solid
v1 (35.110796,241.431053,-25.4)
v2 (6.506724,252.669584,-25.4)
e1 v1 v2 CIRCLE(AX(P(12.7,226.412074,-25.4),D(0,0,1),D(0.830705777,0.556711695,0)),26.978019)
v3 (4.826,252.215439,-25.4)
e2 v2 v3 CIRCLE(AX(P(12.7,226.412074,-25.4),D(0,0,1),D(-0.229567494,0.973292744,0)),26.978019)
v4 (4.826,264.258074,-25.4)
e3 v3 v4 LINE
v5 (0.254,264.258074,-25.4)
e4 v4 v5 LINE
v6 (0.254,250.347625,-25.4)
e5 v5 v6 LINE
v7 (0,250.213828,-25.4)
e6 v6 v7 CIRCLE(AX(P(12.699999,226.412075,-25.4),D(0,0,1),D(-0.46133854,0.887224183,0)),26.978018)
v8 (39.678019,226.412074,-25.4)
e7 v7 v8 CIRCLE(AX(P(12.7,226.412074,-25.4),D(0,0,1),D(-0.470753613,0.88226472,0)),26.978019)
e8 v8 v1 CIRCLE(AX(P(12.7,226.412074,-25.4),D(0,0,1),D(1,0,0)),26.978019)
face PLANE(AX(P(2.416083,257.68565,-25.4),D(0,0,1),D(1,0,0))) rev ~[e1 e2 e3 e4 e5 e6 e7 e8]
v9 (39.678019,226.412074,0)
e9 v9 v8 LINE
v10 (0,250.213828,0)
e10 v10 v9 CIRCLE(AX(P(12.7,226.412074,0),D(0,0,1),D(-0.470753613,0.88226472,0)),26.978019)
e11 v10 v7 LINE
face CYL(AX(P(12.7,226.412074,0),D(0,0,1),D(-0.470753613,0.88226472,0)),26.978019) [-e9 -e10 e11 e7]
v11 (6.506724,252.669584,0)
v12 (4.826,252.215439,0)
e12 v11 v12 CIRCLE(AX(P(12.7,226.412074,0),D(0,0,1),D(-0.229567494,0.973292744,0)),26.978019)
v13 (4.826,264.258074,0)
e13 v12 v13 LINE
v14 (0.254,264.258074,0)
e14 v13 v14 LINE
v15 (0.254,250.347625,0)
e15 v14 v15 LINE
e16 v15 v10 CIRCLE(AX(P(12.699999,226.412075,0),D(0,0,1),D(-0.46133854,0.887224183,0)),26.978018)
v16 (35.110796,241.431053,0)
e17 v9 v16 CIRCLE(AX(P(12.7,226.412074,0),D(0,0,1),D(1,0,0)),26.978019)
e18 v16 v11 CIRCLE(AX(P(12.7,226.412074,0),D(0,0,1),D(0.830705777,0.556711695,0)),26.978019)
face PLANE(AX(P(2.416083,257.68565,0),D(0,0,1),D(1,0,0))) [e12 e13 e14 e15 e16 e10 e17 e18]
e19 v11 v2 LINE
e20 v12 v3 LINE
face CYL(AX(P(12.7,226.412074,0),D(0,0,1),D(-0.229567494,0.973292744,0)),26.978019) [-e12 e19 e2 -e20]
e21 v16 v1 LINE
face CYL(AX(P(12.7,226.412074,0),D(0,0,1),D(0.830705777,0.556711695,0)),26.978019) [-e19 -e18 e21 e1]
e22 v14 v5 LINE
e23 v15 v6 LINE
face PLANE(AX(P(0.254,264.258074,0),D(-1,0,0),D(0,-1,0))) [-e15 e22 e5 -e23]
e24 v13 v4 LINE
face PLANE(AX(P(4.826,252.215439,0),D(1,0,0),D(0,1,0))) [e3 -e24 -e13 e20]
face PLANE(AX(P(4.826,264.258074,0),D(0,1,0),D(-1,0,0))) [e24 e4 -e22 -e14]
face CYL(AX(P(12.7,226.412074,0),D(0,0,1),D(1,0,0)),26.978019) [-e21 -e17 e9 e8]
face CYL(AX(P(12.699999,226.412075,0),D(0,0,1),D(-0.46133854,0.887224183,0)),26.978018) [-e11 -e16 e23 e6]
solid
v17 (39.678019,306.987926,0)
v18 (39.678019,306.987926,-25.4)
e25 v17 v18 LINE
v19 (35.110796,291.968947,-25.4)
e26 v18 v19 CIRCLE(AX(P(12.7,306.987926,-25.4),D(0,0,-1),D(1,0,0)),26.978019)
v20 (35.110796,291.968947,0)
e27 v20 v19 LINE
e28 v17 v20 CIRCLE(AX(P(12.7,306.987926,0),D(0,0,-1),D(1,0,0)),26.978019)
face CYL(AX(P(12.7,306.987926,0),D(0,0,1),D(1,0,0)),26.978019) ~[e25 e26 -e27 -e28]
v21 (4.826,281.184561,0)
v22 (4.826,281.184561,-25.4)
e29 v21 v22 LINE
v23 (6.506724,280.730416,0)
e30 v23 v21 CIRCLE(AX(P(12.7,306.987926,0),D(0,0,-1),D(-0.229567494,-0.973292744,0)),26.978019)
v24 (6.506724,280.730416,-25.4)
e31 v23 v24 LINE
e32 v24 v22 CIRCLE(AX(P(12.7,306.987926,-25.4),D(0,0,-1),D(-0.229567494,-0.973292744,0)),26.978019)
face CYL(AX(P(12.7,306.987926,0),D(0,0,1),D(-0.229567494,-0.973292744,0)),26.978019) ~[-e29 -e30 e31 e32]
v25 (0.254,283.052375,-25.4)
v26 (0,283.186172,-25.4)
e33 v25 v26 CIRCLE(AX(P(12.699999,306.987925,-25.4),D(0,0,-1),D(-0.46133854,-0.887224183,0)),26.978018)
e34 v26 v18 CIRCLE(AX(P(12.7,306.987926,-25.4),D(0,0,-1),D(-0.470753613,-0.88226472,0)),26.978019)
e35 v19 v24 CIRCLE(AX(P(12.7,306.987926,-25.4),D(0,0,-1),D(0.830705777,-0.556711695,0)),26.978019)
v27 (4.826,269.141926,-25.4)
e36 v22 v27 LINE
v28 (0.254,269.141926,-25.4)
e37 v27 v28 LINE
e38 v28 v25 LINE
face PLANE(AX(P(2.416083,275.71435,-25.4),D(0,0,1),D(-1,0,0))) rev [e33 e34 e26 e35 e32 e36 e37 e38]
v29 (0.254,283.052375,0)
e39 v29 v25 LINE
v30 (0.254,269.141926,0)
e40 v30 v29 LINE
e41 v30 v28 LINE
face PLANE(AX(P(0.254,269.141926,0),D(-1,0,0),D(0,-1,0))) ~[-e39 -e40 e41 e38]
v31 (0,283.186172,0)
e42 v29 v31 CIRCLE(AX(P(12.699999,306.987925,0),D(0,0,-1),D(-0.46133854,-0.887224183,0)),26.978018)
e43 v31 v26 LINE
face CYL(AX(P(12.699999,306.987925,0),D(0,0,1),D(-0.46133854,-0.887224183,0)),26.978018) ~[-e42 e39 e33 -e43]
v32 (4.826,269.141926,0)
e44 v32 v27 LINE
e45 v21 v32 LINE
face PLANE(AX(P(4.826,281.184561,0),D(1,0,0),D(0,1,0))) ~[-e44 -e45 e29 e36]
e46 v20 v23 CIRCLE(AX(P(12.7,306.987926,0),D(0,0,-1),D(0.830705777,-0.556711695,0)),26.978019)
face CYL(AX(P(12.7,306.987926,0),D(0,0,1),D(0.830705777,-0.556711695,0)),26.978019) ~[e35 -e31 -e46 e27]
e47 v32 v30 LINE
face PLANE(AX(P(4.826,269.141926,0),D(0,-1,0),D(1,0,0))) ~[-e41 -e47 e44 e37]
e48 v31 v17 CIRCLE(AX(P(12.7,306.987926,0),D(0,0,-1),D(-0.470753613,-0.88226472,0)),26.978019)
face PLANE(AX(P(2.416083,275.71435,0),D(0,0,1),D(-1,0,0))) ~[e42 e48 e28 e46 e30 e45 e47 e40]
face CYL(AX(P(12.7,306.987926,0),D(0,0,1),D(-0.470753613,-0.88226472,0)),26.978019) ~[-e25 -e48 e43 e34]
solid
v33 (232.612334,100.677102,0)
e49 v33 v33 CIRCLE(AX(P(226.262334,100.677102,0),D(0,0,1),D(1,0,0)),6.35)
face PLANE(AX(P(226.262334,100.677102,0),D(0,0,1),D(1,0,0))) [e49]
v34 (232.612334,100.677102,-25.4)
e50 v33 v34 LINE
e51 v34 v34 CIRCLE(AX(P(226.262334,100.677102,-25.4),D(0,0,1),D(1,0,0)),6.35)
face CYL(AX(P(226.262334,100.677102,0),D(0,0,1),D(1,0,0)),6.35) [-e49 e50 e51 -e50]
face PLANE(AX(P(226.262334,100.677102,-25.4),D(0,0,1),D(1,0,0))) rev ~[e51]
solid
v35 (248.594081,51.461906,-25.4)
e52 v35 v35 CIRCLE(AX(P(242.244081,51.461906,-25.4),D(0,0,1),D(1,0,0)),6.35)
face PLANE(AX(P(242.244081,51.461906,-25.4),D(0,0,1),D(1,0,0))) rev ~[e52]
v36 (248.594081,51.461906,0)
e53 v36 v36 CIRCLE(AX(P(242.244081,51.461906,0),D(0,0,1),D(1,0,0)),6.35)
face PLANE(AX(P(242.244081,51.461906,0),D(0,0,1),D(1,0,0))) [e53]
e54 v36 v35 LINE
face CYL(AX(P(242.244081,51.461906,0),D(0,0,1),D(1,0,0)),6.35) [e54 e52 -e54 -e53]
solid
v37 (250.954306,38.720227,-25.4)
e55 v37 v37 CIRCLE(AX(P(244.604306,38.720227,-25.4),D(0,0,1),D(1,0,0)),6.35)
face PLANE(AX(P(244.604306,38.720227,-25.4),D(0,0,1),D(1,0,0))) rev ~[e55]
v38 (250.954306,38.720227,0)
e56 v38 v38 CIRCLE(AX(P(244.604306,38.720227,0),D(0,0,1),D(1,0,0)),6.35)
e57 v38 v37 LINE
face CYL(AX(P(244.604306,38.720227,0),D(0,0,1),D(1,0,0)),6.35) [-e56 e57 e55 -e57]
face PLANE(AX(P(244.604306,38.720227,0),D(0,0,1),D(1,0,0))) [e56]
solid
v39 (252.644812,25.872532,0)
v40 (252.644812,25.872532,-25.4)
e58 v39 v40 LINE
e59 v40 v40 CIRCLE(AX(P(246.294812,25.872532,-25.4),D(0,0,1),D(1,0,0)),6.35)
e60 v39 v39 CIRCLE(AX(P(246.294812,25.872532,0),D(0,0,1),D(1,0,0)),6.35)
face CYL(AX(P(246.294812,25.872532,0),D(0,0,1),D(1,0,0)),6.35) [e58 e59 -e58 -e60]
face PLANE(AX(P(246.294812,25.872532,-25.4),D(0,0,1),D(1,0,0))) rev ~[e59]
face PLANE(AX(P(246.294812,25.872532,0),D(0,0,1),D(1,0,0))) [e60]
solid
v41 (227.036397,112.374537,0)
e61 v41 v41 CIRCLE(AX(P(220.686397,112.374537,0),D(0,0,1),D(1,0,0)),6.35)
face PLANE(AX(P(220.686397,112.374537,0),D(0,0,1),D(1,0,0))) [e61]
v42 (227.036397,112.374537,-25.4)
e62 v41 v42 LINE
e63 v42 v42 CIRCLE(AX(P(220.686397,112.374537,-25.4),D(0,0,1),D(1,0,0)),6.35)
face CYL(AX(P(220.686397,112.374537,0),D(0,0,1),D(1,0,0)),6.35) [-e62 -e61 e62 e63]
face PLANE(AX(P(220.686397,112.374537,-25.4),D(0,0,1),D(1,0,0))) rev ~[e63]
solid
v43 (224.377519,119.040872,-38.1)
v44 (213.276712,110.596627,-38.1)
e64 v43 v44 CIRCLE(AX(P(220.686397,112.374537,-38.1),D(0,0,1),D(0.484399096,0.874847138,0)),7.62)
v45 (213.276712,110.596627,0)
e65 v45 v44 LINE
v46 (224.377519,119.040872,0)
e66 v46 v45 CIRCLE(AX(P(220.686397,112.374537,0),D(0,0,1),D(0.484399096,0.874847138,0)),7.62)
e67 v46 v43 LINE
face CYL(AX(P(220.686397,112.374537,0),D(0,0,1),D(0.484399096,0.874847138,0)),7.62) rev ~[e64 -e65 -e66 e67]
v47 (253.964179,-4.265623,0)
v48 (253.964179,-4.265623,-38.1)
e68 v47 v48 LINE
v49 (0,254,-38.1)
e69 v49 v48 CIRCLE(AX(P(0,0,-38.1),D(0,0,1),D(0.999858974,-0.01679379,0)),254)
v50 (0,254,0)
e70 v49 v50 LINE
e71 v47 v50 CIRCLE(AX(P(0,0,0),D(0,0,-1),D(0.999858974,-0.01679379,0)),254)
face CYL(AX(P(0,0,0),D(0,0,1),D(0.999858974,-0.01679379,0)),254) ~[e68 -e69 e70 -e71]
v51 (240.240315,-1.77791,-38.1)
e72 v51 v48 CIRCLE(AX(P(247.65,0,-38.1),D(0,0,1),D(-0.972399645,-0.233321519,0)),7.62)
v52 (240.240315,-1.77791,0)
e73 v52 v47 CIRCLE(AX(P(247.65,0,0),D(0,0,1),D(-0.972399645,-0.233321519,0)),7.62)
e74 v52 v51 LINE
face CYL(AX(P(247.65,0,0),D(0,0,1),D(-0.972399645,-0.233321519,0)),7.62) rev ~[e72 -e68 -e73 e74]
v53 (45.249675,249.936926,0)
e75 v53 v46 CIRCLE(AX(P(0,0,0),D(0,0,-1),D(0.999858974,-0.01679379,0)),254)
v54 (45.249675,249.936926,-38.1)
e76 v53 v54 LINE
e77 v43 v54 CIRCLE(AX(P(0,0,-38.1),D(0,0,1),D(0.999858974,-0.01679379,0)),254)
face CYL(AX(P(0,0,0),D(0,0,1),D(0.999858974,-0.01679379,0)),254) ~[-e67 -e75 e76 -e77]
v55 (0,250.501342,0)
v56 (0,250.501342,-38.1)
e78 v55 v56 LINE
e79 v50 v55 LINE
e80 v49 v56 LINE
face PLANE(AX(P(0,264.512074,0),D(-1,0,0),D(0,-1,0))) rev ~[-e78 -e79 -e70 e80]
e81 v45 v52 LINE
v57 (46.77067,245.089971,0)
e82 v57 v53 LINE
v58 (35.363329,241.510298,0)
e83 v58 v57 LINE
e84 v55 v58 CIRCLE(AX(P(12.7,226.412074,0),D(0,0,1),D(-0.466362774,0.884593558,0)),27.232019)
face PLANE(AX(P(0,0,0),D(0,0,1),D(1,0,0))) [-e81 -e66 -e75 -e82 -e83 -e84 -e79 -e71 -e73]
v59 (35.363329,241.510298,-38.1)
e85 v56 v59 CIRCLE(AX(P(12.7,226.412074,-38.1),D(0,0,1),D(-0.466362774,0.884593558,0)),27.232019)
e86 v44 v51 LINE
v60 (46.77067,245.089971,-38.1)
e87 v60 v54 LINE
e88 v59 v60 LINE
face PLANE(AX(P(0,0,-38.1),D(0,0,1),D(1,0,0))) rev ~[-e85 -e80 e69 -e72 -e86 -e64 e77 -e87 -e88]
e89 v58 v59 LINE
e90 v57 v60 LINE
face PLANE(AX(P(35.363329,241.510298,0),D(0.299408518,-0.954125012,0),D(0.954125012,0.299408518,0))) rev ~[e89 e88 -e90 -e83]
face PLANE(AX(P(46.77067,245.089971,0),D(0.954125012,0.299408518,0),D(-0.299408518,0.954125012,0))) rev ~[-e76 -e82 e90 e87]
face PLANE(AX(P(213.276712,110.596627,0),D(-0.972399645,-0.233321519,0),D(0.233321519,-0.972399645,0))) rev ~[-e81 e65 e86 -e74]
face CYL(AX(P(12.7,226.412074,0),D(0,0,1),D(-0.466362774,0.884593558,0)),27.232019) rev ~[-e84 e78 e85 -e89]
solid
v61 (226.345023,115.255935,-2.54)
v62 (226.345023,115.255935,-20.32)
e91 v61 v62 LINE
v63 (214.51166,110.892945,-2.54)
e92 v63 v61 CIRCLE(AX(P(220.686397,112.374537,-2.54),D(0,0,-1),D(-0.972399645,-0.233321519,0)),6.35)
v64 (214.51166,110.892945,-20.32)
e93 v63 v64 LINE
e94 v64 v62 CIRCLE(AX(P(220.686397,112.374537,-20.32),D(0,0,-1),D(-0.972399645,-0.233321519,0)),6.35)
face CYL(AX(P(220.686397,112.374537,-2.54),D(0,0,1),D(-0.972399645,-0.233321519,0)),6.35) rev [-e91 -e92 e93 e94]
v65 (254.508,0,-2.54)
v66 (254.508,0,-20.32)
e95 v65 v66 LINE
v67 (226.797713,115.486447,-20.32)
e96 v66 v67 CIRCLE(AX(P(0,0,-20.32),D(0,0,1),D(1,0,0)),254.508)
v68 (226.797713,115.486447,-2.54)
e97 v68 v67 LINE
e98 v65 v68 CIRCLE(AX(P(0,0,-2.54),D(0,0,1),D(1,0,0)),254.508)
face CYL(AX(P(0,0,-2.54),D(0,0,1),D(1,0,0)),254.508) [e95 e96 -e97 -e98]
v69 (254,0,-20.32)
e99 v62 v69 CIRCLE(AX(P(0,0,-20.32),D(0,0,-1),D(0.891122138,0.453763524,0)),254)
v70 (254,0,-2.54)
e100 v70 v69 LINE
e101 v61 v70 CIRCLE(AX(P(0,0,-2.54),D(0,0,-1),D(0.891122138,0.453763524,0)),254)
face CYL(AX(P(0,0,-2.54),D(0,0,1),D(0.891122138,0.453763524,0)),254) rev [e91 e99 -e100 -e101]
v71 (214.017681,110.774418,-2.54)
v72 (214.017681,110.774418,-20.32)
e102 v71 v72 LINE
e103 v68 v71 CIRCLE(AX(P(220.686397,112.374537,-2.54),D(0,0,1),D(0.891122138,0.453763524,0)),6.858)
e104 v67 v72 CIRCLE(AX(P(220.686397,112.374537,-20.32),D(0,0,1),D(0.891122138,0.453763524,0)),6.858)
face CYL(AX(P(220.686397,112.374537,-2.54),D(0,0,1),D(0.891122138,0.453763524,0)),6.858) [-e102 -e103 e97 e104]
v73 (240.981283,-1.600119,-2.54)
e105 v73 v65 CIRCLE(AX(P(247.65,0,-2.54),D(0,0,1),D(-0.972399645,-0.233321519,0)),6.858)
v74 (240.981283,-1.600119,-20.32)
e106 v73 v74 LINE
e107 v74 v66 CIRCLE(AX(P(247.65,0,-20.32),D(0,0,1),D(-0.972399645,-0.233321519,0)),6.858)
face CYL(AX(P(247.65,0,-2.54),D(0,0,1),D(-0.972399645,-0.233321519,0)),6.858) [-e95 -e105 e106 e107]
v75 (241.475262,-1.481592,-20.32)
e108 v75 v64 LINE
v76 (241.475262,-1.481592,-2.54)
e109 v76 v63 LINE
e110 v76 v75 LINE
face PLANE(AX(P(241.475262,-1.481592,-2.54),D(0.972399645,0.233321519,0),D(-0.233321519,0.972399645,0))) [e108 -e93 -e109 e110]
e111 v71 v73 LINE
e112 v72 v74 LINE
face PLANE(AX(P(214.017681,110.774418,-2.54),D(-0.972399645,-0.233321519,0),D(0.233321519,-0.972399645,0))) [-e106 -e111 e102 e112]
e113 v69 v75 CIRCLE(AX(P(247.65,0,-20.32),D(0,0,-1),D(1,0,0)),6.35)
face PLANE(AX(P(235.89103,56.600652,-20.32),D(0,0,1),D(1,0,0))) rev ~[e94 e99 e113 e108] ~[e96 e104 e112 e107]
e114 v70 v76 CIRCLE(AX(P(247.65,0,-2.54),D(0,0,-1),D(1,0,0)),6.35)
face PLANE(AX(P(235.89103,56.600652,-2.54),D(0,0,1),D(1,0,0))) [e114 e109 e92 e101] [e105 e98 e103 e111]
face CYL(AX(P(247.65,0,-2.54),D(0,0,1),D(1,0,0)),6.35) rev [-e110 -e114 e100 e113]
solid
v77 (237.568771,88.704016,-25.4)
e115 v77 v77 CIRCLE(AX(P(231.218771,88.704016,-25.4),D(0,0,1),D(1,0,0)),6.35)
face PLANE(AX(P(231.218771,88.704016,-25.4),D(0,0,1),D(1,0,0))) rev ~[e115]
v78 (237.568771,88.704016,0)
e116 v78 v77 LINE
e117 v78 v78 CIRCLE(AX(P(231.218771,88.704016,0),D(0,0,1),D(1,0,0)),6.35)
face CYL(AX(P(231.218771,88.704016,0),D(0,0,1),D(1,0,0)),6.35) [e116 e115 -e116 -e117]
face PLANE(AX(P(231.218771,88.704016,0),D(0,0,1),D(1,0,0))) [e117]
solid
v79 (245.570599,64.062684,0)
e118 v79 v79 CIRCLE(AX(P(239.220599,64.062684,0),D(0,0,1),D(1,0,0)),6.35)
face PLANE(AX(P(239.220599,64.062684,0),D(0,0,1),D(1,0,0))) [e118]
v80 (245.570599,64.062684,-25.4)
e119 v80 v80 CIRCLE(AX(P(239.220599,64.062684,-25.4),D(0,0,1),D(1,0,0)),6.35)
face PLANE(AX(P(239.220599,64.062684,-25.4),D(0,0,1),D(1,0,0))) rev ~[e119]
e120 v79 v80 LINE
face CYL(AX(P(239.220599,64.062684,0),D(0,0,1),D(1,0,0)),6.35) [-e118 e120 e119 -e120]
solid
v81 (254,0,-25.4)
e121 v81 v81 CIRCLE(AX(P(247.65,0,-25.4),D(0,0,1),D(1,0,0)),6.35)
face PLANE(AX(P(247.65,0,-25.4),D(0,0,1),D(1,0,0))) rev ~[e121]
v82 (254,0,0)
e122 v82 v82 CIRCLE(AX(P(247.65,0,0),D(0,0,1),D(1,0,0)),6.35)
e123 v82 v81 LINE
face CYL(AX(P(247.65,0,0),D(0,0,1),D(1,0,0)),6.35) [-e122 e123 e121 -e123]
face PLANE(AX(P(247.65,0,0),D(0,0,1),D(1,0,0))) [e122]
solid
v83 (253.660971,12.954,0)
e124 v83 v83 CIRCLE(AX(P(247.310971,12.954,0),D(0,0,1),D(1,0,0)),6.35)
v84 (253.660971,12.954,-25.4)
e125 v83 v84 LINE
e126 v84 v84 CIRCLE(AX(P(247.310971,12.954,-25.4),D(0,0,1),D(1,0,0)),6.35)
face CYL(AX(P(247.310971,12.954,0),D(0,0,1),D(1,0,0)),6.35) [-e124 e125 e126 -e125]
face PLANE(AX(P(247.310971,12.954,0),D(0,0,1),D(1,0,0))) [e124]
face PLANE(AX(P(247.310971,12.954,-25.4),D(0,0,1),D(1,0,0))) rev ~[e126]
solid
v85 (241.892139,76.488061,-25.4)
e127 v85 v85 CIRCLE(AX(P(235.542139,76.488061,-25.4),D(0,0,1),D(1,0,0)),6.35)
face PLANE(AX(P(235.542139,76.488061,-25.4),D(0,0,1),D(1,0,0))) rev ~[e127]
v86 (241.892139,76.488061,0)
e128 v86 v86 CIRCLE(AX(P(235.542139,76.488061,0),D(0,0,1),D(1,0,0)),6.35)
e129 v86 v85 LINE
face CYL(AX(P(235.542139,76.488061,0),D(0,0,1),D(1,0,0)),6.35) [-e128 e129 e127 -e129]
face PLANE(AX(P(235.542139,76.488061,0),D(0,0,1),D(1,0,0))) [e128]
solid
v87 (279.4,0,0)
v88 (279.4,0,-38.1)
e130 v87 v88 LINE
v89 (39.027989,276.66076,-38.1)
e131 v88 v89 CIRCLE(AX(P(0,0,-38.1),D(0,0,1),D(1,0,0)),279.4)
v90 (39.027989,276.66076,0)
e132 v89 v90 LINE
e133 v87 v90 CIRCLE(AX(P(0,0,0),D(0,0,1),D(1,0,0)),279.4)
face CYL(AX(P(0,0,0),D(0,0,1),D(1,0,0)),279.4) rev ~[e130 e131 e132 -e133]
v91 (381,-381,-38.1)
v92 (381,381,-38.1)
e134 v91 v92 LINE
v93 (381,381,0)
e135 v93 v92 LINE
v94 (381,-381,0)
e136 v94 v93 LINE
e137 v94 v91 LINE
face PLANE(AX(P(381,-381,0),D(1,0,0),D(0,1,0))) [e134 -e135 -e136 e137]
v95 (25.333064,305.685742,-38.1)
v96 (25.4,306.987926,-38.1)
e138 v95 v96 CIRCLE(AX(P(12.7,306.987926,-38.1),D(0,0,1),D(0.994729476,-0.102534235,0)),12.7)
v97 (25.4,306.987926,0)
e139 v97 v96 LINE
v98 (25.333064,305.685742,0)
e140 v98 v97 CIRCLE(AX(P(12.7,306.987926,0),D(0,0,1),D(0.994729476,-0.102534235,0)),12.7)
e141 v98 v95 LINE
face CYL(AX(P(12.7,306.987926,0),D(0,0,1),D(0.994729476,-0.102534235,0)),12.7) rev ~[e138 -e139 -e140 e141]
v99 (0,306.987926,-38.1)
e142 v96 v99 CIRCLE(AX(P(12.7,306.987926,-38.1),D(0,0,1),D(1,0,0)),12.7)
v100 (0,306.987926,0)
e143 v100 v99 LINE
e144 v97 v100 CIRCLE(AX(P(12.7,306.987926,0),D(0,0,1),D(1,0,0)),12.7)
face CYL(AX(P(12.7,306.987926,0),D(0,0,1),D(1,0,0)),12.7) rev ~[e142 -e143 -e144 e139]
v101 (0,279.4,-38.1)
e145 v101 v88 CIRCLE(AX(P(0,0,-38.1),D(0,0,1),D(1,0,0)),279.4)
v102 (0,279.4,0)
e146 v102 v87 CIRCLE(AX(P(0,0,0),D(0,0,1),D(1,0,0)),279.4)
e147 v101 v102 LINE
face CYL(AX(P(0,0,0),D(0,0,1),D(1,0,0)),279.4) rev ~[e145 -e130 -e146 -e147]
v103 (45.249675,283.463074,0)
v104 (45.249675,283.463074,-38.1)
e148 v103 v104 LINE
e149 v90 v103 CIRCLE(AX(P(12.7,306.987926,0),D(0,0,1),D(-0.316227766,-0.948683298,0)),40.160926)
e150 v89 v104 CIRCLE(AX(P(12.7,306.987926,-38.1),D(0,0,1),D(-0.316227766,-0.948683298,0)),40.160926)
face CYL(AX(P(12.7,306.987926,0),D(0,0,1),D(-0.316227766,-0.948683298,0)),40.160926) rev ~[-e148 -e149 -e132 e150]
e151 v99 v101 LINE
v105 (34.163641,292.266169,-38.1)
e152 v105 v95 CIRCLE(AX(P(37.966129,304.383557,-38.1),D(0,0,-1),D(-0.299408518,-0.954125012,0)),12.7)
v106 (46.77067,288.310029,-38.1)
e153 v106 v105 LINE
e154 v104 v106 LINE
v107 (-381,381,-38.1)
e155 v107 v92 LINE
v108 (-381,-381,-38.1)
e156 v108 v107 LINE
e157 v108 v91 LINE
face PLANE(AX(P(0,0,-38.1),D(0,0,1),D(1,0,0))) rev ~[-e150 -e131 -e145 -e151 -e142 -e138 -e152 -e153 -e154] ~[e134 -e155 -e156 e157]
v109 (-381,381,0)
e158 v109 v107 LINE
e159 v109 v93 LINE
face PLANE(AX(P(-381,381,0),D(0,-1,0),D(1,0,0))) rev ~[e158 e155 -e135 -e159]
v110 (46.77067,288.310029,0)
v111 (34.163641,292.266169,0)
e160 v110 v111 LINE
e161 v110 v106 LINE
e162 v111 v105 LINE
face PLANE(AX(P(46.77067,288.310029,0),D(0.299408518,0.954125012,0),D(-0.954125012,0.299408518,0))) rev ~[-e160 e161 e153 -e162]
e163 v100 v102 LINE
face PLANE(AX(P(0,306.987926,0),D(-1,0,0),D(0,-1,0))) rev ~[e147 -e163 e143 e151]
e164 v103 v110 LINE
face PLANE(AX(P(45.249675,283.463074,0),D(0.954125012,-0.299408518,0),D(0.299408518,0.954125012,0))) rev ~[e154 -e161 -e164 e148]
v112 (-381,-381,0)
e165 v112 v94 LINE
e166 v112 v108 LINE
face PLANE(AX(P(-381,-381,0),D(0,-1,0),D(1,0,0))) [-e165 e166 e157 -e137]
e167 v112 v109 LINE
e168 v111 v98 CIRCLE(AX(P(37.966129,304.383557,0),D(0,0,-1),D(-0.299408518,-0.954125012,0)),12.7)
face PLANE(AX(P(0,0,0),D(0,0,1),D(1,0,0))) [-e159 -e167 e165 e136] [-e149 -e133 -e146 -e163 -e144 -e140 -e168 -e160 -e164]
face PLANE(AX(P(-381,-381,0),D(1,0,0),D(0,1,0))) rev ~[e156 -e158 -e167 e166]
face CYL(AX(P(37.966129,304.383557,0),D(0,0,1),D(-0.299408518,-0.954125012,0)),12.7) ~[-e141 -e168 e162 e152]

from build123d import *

# Parameters (mm, degrees)
F0_W      = 762
F0_H      = 762
F1_DEPTH  = 38.1
F2_R      = 279.4
F3_DEPTH  = 38.101
F5_DEPTH  = 38.101
F7_START  = -2.54
F7_DEPTH  = 17.78
F8_R      = 6.35
F9_DEPTH  = 25.4
F11_DEPTH = 38.1
F14_DEPTH = 25.4


# Not quite as in the source:
# - a feature of the source that left no trace in its solid (it failed there, or was rolled back) is left out


with BuildPart() as f1:
    # F0 (on Top) → F1 (new body)
    with BuildSketch(Plane.XY):
        Rectangle(F0_W, F0_H)
    extrude(amount=-F1_DEPTH)

    # F2 (on face) → F3 (cut, through all)
    with BuildSketch(Plane.XY):
        Circle(F2_R)
        with BuildLine():
            ThreePointArc((224.3775185155, 119.0408719088), (246.4831532813, 61.3355944662), (254, 0))
            ThreePointArc((254, 0), (253.9910447139, -2.1328865718), (253.9641794872, -4.2656227451))
            ThreePointArc((253.9641794872, -4.2656227451), (-246.9895097327, -59.2636657828), (224.3775185155, 119.0408719088))
        make_face(mode=Mode.SUBTRACT)
    extrude(amount=-F3_DEPTH, mode=Mode.SUBTRACT)

    # F4 (on face) → F5 (cut, through all)
    with BuildSketch(Plane.XY):
        with BuildLine():
            ThreePointArc((224.3775185155, 119.0408719088), (216.0730202223, 118.4392832877), (213.2767121099, 110.5966267409))
            Line((213.2767121099, 110.5966267409), (240.240314708, -1.7779099735))
            ThreePointArc((240.240314708, -1.7779099735), (246.2908782429, -7.4978122175), (253.9641794872, -4.2656227451))
            ThreePointArc((253.9641794872, -4.2656227451), (246.9895097327, 59.2636657828), (224.3775185155, 119.0408719088))
        make_face()
    extrude(amount=-F5_DEPTH, mode=Mode.SUBTRACT)

    # F10 (on face) → F11 (cut, through all)
    with BuildSketch(Plane.XY):
        with BuildLine():
            Line((5.08, 264.5120737159), (0, 264.5120737159))
            Line((0, 264.5120737159), (0, 250.501342462))
            Line((0, 250.501342462), (0, 226.4120737159))
            ThreePointArc((0, 226.4120737159), (2.4632622422, 233.9286686948), (8.8975118233, 238.5294613743))
            Line((8.8975118233, 238.5294613743), (12.615777201, 239.6962689846))
            ThreePointArc((12.615777201, 239.6962689846), (7.1292810208, 244.38136211), (5.08, 251.2988895025))
            Line((5.08, 251.2988895025), (5.08, 264.5120737159))
        make_face()
        with BuildLine():
            ThreePointArc((45.2496747987, 249.9369259045), (25.0130471791, 264.6388819683), (0, 264.5120737159))
            Line((0, 264.5120737159), (5.08, 264.5120737159))
            Line((5.08, 264.5120737159), (5.08, 251.2988895025))
            ThreePointArc((5.08, 251.2988895025), (7.1292810208, 244.38136211), (12.615777201, 239.6962689846))
            Line((12.615777201, 239.6962689846), (45.2496747987, 249.9369259045))
        make_face()
        with BuildLine():
            Line((0, 226.4120737159), (0, 250.501342462))
            ThreePointArc((0, 250.501342462), (5.9898062687, 200.019723142), (35.3633290174, 241.5102983325))
            Line((35.3633290174, 241.5102983325), (34.163640517, 241.1338309397))
            ThreePointArc((34.163640517, 241.1338309397), (27.3570251588, 235.9976267185), (25.3330643469, 227.7142584986))
            ThreePointArc((25.3330643469, 227.7142584986), (25.3832550476, 227.064025706), (25.4, 226.4120737159))
            ThreePointArc((25.4, 226.4120737159), (12.7, 213.7120737159), (0, 226.4120737159))
        make_face()
        with BuildLine():
            Line((46.7706700694, 245.0899708412), (45.2496747987, 249.9369259045))
            Line((45.2496747987, 249.9369259045), (12.615777201, 239.6962689846))
            ThreePointArc((12.615777201, 239.6962689846), (13.9050170211, 239.2044896864), (15.24, 238.8554816092))
            ThreePointArc((15.24, 238.8554816092), (22.1120764722, 234.938668375), (25.3330643469, 227.7142584986))
            ThreePointArc((25.3330643469, 227.7142584986), (27.3570251588, 235.9976267185), (34.163640517, 241.1338309397))
            Line((34.163640517, 241.1338309397), (35.3633290174, 241.5102983325))
            Line((35.3633290174, 241.5102983325), (46.7706700694, 245.0899708412))
        make_face()
        with BuildLine():
            Line((0, 306.9879262841), (0, 268.8879262841))
            ThreePointArc((0, 268.8879262841), (25.0130471791, 268.7611180317), (45.2496747987, 283.4630740955))
            Line((45.2496747987, 283.4630740955), (46.7706700694, 288.3100291588))
            Line((46.7706700694, 288.3100291588), (34.163640517, 292.2661690603))
            ThreePointArc((34.163640517, 292.2661690603), (27.3570251588, 297.4023732815), (25.3330643469, 305.6857415014))
            ThreePointArc((25.3330643469, 305.6857415014), (12.0480480098, 294.3046712365), (0, 306.9879262841))
        make_face()
        with BuildLine():
            ThreePointArc((25.4, 306.9879262841), (12.7, 319.6879262841), (0, 306.9879262841))
            ThreePointArc((0, 306.9879262841), (12.0480480098, 294.3046712365), (25.3330643469, 305.6857415014))
            ThreePointArc((25.3330643469, 305.6857415014), (25.3832550476, 306.335974294), (25.4, 306.9879262841))
        make_face()
        with BuildLine():
            ThreePointArc((15.24, 238.8554816092), (13.9050170211, 239.2044896864), (12.615777201, 239.6962689846))
            Line((12.615777201, 239.6962689846), (8.8975118233, 238.5294613743))
            ThreePointArc((8.8975118233, 238.5294613743), (12.0480480098, 239.0953287635), (15.24, 238.8554816092))
        make_face()
        with BuildLine():
            ThreePointArc((8.8975118233, 238.5294613743), (2.4632622422, 233.9286686948), (0, 226.4120737159))
            ThreePointArc((0, 226.4120737159), (12.7, 213.7120737159), (25.4, 226.4120737159))
            ThreePointArc((25.4, 226.4120737159), (25.3832550476, 227.064025706), (25.3330643469, 227.7142584986))
            ThreePointArc((25.3330643469, 227.7142584986), (22.1120764722, 234.938668375), (15.24, 238.8554816092))
            ThreePointArc((15.24, 238.8554816092), (12.0480480098, 239.0953287635), (8.8975118233, 238.5294613743))
        make_face()
    extrude(amount=-F11_DEPTH, mode=Mode.SUBTRACT)


with BuildPart() as f7:
    # F6 (on face) → F7 (new body)
    with BuildSketch(Plane.XY.offset(F7_START)):
        with BuildLine():
            Line((214.0176806391, 110.7744177383), (240.9812832372, -1.6001189761))
            ThreePointArc((240.9812832372, -1.6001189761), (248.4556377725, -6.8105147955), (254.508, 0))
            ThreePointArc((254.508, 0), (247.4834887521, 59.3821931143), (226.7977130223, 115.4864469619))
            ThreePointArc((226.7977130223, 115.4864469619), (218.3139558622, 118.8091062525), (214.0176806391, 110.7744177383))
        make_face()
        with BuildLine():
            ThreePointArc((254, 0), (248.3959609004, -6.306032218), (241.4752622567, -1.4815916446))
            Line((241.4752622567, -1.4815916446), (214.5116596586, 110.8929450698))
            ThreePointArc((214.5116596586, 110.8929450698), (218.4896922725, 118.3324714719), (226.3450229763, 115.2559350917))
            ThreePointArc((226.3450229763, 115.2559350917), (246.9895097327, 59.2636657828), (254, 0))
        make_face(mode=Mode.SUBTRACT)
    extrude(amount=-F7_DEPTH)


with BuildPart() as f9:
    # F8 (on face) → F9 (new body)
    with BuildSketch(Plane.XY):
        with Locations((247.65, 0)):
            Circle(F8_R)
    extrude(amount=-F9_DEPTH)


with BuildPart() as f9b:
    # F8 (on face) → F9, piece 2 (new body)
    with BuildSketch(Plane.XY):
        with Locations((247.3109710142, 12.954)):
            Circle(F8_R)
    extrude(amount=-F9_DEPTH)


with BuildPart() as f9c:
    # F8 (on face) → F9, piece 3 (new body)
    with BuildSketch(Plane.XY):
        with Locations((246.2948123077, 25.8725323523)):
            Circle(F8_R)
    extrude(amount=-F9_DEPTH)


with BuildPart() as f9d:
    # F8 (on face) → F9, piece 4 (new body)
    with BuildSketch(Plane.XY):
        with Locations((244.6043060912, 38.7202265183)):
            Circle(F8_R)
    extrude(amount=-F9_DEPTH)


with BuildPart() as f9e:
    # F8 (on face) → F9, piece 5 (new body)
    with BuildSketch(Plane.XY):
        with Locations((242.2440809181, 51.4619059126)):
            Circle(F8_R)
    extrude(amount=-F9_DEPTH)


with BuildPart() as f9f:
    # F8 (on face) → F9, piece 6 (new body)
    with BuildSketch(Plane.XY):
        with Locations((239.2205990111, 64.0626842144)):
            Circle(F8_R)
    extrude(amount=-F9_DEPTH)


with BuildPart() as f9g:
    # F8 (on face) → F9, piece 7 (new body)
    with BuildSketch(Plane.XY):
        with Locations((235.5421385695, 76.488060886)):
            Circle(F8_R)
    extrude(amount=-F9_DEPTH)


with BuildPart() as f9h:
    # F8 (on face) → F9, piece 8 (new body)
    with BuildSketch(Plane.XY):
        with Locations((231.2187711031, 88.704015634)):
            Circle(F8_R)
    extrude(amount=-F9_DEPTH)


with BuildPart() as f9i:
    # F8 (on face) → F9, piece 9 (new body)
    with BuildSketch(Plane.XY):
        with Locations((226.262333857, 100.6771015553)):
            Circle(F8_R)
    extrude(amount=-F9_DEPTH)


with BuildPart() as f9j:
    # F8 (on face) → F9, piece 10 (new body)
    with BuildSketch(Plane.XY):
        with Locations((220.6863974019, 112.3745367144)):
            Circle(F8_R)
    extrude(amount=-F9_DEPTH)


with BuildPart() as f14:
    # F13 (on face) → F14 (new body)
    with BuildSketch(Plane.XY):
        with BuildLine():
            Line((4.826, 254), (4.826, 264.2580737159))
            Line((4.826, 264.2580737159), (0.254, 264.2580737159))
            Line((0.254, 264.2580737159), (0.254, 250.3476247431))
            ThreePointArc((0.254, 250.3476247431), (2.4971679316, 251.3863752429), (4.826, 252.2154386704))
            Line((4.826, 252.2154386704), (4.826, 254))
        make_face()
        with BuildLine():
            ThreePointArc((4.826, 252.2154386704), (2.4971679316, 251.3863752429), (0.254, 250.3476247431))
            Line((0.254, 250.3476247431), (0.254, 226.4120737159))
            ThreePointArc((0.254, 226.4120737159), (13.3389129504, 213.9824837692), (25.0804030599, 227.6882148029))
            ThreePointArc((25.0804030599, 227.6882148029), (21.9238349428, 234.7681364818), (15.1892, 238.6066134513))
            ThreePointArc((15.1892, 238.6066134513), (13.8275173615, 238.9626016901), (12.512492745, 239.4642165743))
            ThreePointArc((12.512492745, 239.4642165743), (6.9162666412, 244.2430115622), (4.826, 251.2988895025))
            Line((4.826, 251.2988895025), (4.826, 252.2154386704))
        make_face()
        with BuildLine():
            Line((0, 226.4120737159), (0, 250.2138282516))
            ThreePointArc((0, 250.2138282516), (-1.1779082604, 203.2773123967), (39.6780191819, 226.4120737159))
            ThreePointArc((39.6780191819, 226.4120737159), (38.5109706705, 234.2611062693), (35.1107963914, 241.4310525122))
            Line((35.1107963914, 241.4310525122), (34.163640517, 241.1338309397))
            ThreePointArc((34.163640517, 241.1338309397), (27.3570251588, 235.9976267185), (25.3330643469, 227.7142584986))
            ThreePointArc((25.3330643469, 227.7142584986), (25.3832550476, 227.064025706), (25.4, 226.4120737159))
            ThreePointArc((25.4, 226.4120737159), (12.7, 213.7120737159), (0, 226.4120737159))
        make_face()
        with BuildLine():
            Line((0.254, 226.4120737159), (0.254, 250.3476247431))
            ThreePointArc((0.254, 250.3476247431), (0.1268220256, 250.2810643649), (0, 250.2138282516))
            Line((0, 250.2138282516), (0, 226.4120737159))
            ThreePointArc((0, 226.4120737159), (12.7, 213.7120737159), (25.4, 226.4120737159))
            ThreePointArc((25.4, 226.4120737159), (25.3832550476, 227.064025706), (25.3330643469, 227.7142584986))
            ThreePointArc((25.3330643469, 227.7142584986), (27.3570251588, 235.9976267185), (34.163640517, 241.1338309397))
            Line((34.163640517, 241.1338309397), (35.1107963914, 241.4310525122))
            ThreePointArc((35.1107963914, 241.4310525122), (22.565502396, 251.5215416802), (6.5067237427, 252.6695840354))
            ThreePointArc((6.5067237427, 252.6695840354), (5.6626974395, 252.4560728644), (4.826, 252.2154386704))
            Line((4.826, 252.2154386704), (4.826, 251.2988895025))
            ThreePointArc((4.826, 251.2988895025), (6.9162666412, 244.2430115622), (12.512492745, 239.4642165743))
            ThreePointArc((12.512492745, 239.4642165743), (13.8275173615, 238.9626016901), (15.1892, 238.6066134513))
            ThreePointArc((15.1892, 238.6066134513), (21.9238349428, 234.7681364818), (25.0804030599, 227.6882148029))
            ThreePointArc((25.0804030599, 227.6882148029), (13.3389129504, 213.9824837692), (0.254, 226.4120737159))
        make_face()
    extrude(amount=-F14_DEPTH)


with BuildPart() as f16_1:
    # F16: instance of F14
    add(f14.part.mirror(Plane(origin=(0, 266.7, 0), x_dir=(-1, 0, 0), z_dir=(0, 1, 0))))


solid = Compound([f1.part, f7.part, f9.part, f9b.part, f9c.part, f9d.part, f9e.part, f9f.part, f9g.part, f9h.part, f9i.part, f9j.part, f14.part, f16_1.part])
